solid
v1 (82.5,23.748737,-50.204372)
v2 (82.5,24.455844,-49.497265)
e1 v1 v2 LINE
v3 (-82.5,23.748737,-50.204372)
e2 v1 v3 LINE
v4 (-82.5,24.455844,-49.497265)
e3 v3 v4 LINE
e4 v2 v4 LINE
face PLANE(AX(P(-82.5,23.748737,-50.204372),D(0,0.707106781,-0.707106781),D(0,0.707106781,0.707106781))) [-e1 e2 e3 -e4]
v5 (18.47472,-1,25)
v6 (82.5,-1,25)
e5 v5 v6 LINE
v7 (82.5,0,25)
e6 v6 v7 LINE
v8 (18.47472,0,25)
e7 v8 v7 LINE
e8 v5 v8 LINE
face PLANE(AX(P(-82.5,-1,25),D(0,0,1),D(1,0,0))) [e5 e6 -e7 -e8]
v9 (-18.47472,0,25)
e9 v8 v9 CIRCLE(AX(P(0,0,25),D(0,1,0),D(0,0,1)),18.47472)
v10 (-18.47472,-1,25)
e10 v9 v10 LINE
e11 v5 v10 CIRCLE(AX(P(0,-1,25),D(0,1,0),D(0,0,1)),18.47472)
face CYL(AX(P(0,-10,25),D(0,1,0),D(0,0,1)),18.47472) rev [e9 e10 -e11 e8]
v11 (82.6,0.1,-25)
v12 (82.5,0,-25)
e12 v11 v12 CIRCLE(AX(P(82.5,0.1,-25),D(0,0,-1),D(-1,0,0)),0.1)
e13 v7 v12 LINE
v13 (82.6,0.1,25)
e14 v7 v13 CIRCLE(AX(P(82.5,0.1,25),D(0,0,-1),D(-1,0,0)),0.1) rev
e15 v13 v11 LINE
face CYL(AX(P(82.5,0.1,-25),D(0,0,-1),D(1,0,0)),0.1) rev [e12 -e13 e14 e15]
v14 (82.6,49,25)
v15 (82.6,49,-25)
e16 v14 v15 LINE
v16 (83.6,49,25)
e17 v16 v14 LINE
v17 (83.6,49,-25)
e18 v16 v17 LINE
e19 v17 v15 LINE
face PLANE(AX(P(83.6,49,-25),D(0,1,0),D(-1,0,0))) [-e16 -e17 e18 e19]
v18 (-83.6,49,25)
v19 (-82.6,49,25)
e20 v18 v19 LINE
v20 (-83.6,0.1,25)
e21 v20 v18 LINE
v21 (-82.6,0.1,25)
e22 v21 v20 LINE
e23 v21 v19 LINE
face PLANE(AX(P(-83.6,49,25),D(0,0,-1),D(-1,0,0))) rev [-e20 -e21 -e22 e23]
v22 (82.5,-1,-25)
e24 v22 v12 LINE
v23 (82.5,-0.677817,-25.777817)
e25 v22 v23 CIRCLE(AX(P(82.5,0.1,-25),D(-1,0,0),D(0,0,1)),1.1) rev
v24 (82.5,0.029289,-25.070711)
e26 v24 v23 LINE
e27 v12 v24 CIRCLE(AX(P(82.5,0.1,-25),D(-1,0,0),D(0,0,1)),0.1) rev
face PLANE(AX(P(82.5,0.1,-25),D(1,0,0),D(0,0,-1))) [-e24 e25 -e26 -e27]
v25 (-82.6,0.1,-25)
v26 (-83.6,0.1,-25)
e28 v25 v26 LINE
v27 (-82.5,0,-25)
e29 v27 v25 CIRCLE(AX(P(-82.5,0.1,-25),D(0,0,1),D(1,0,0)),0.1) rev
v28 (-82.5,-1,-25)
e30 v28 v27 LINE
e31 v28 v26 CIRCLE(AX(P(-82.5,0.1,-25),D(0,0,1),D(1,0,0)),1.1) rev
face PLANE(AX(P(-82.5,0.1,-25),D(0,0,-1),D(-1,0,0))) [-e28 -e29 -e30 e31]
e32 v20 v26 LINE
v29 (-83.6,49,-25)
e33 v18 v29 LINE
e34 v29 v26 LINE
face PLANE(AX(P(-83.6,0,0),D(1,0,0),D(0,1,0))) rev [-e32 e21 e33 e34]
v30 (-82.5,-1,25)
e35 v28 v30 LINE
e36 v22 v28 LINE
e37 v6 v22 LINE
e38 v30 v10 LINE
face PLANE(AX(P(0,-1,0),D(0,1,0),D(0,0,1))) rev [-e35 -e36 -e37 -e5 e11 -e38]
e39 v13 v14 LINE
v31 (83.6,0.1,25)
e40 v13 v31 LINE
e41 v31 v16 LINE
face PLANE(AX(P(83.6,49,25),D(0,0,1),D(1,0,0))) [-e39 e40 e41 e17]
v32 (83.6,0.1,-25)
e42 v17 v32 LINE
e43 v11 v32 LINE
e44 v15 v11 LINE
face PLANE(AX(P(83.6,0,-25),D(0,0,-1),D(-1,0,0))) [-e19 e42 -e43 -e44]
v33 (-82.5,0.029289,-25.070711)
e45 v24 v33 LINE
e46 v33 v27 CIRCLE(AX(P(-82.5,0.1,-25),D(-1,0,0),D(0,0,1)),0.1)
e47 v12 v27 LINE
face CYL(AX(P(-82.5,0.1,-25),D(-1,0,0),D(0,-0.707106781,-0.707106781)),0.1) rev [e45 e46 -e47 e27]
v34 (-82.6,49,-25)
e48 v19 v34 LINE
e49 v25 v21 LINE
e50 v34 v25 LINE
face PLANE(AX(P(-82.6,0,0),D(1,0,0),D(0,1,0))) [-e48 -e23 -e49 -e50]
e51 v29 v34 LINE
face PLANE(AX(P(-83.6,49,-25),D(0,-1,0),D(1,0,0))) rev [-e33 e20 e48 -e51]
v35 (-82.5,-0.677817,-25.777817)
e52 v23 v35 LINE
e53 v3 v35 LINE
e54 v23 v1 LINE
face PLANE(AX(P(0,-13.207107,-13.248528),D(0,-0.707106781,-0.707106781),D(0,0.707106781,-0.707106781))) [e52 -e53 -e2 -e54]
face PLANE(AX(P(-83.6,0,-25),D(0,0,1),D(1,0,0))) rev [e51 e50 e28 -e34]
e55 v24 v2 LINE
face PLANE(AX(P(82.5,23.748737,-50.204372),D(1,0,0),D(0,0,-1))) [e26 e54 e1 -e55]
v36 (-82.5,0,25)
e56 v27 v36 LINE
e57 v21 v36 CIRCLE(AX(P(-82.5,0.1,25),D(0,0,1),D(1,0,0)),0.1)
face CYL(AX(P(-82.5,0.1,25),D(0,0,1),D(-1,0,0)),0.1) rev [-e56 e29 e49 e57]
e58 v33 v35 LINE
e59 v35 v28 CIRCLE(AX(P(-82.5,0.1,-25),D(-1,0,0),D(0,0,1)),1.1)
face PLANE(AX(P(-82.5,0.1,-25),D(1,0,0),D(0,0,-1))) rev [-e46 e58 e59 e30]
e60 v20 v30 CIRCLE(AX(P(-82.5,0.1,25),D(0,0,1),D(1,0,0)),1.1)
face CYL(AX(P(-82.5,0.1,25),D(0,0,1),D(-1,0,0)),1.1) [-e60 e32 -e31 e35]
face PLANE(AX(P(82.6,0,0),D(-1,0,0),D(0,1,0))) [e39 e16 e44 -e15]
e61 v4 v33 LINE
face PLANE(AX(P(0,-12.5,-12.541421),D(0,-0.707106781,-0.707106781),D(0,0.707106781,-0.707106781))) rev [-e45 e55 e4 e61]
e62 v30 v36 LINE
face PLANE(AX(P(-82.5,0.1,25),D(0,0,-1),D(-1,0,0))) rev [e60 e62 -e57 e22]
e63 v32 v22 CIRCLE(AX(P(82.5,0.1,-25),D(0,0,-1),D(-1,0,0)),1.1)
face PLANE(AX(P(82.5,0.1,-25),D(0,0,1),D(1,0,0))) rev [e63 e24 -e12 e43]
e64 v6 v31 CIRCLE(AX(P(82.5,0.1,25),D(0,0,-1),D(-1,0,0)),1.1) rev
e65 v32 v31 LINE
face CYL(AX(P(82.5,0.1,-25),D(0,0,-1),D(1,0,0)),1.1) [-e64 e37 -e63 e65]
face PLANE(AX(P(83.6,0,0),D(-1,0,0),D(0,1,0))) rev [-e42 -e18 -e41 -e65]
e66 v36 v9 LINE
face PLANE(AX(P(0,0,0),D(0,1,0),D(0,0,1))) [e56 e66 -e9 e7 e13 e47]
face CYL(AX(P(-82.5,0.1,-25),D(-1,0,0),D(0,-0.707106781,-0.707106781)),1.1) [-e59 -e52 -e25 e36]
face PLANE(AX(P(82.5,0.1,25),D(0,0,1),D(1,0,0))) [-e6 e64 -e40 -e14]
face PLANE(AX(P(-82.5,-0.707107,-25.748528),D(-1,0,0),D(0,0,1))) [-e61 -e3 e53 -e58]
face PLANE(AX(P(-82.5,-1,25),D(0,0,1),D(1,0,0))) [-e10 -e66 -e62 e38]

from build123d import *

# Parameters (mm, degrees)
SKETCH_1_W             = 165
SKETCH_1_H             = 50
SM_BASE_FLANGE_1_DEPTH = 1
SM_EDGE_FLANGE_1_DEPTH = 50
SKETCH_9_R             = 18.474720046
CUT_EXTRUDE_1_DEPTH    = 10
SM_EDGE_FLANGE_2_DEPTH = 165


# Sheet-metal steps are written as plain solids
with BuildPart() as part:
    # Sketch 1 → 基体-法兰1 (new body)
    with BuildSketch(Plane(origin=(0, 0, 0), x_dir=(1, 0, 0), z_dir=(0, 1, 0))):
        Rectangle(SKETCH_1_W, SKETCH_1_H)
    extrude(amount=-SM_BASE_FLANGE_1_DEPTH)

    # 边线-法兰1 section (across the edge) → 边线-法兰1 (add)
    with BuildSketch(Plane(origin=(-82.6, 0, -25), x_dir=(1, 0, 0), z_dir=(0, 0, 1))):
        with BuildLine():
            Line((-1, 0.1), (-1, 49))
            Line((-1, 49), (0, 49))
            Line((0, 49), (0, 0.1))
            ThreePointArc((0, 0.1), (0.029289322, 0.029289322), (0.1, 0))
            Line((0.1, 0), (0.1, -1))
            ThreePointArc((0.1, -1), (-0.677817459, -0.677817459), (-1, 0.1))
        make_face()
    sm_edge_flange_1 = extrude(amount=SM_EDGE_FLANGE_1_DEPTH)

    # 镜向1: 边线-法兰1 across plane
    add(sm_edge_flange_1.mirror(Plane(origin=(0, 0, 0), x_dir=(0, 0, 1), z_dir=(1, 0, 0))))

    # 草图9 → 切除-拉伸1 (cut)
    with BuildSketch(Plane(origin=(0, 0, 0), x_dir=(1, 0, 0), z_dir=(0, 1, 0))):
        with Locations((0, -25)):
            Circle(SKETCH_9_R)
    extrude(amount=-CUT_EXTRUDE_1_DEPTH, mode=Mode.SUBTRACT)

    # 边线-法兰2 section (across the edge) → 边线-法兰2 (add)
    with BuildSketch(Plane(origin=(82.5, 0, -25.041421356), x_dir=(0, 0.7071067811865512, 0.7071067811865438), z_dir=(-1, 0, 0))):
        with BuildLine():
            Line((-1, 0.041421356), (-1, 34.585786438))
            Line((-1, 34.585786438), (0, 34.585786438))
            Line((0, 34.585786438), (0, 0.041421356))
            ThreePointArc((0, 0.041421356), (0.007612047, 0.003153013), (0.029289322, -0.029289322))
            Line((0.029289322, -0.029289322), (-0.677817459, -0.736396103))
            ThreePointArc((-0.677817459, -0.736396103), (-0.916267486, -0.379530419), (-1, 0.041421356))
        make_face()
    extrude(amount=SM_EDGE_FLANGE_2_DEPTH)


solid = part.part
